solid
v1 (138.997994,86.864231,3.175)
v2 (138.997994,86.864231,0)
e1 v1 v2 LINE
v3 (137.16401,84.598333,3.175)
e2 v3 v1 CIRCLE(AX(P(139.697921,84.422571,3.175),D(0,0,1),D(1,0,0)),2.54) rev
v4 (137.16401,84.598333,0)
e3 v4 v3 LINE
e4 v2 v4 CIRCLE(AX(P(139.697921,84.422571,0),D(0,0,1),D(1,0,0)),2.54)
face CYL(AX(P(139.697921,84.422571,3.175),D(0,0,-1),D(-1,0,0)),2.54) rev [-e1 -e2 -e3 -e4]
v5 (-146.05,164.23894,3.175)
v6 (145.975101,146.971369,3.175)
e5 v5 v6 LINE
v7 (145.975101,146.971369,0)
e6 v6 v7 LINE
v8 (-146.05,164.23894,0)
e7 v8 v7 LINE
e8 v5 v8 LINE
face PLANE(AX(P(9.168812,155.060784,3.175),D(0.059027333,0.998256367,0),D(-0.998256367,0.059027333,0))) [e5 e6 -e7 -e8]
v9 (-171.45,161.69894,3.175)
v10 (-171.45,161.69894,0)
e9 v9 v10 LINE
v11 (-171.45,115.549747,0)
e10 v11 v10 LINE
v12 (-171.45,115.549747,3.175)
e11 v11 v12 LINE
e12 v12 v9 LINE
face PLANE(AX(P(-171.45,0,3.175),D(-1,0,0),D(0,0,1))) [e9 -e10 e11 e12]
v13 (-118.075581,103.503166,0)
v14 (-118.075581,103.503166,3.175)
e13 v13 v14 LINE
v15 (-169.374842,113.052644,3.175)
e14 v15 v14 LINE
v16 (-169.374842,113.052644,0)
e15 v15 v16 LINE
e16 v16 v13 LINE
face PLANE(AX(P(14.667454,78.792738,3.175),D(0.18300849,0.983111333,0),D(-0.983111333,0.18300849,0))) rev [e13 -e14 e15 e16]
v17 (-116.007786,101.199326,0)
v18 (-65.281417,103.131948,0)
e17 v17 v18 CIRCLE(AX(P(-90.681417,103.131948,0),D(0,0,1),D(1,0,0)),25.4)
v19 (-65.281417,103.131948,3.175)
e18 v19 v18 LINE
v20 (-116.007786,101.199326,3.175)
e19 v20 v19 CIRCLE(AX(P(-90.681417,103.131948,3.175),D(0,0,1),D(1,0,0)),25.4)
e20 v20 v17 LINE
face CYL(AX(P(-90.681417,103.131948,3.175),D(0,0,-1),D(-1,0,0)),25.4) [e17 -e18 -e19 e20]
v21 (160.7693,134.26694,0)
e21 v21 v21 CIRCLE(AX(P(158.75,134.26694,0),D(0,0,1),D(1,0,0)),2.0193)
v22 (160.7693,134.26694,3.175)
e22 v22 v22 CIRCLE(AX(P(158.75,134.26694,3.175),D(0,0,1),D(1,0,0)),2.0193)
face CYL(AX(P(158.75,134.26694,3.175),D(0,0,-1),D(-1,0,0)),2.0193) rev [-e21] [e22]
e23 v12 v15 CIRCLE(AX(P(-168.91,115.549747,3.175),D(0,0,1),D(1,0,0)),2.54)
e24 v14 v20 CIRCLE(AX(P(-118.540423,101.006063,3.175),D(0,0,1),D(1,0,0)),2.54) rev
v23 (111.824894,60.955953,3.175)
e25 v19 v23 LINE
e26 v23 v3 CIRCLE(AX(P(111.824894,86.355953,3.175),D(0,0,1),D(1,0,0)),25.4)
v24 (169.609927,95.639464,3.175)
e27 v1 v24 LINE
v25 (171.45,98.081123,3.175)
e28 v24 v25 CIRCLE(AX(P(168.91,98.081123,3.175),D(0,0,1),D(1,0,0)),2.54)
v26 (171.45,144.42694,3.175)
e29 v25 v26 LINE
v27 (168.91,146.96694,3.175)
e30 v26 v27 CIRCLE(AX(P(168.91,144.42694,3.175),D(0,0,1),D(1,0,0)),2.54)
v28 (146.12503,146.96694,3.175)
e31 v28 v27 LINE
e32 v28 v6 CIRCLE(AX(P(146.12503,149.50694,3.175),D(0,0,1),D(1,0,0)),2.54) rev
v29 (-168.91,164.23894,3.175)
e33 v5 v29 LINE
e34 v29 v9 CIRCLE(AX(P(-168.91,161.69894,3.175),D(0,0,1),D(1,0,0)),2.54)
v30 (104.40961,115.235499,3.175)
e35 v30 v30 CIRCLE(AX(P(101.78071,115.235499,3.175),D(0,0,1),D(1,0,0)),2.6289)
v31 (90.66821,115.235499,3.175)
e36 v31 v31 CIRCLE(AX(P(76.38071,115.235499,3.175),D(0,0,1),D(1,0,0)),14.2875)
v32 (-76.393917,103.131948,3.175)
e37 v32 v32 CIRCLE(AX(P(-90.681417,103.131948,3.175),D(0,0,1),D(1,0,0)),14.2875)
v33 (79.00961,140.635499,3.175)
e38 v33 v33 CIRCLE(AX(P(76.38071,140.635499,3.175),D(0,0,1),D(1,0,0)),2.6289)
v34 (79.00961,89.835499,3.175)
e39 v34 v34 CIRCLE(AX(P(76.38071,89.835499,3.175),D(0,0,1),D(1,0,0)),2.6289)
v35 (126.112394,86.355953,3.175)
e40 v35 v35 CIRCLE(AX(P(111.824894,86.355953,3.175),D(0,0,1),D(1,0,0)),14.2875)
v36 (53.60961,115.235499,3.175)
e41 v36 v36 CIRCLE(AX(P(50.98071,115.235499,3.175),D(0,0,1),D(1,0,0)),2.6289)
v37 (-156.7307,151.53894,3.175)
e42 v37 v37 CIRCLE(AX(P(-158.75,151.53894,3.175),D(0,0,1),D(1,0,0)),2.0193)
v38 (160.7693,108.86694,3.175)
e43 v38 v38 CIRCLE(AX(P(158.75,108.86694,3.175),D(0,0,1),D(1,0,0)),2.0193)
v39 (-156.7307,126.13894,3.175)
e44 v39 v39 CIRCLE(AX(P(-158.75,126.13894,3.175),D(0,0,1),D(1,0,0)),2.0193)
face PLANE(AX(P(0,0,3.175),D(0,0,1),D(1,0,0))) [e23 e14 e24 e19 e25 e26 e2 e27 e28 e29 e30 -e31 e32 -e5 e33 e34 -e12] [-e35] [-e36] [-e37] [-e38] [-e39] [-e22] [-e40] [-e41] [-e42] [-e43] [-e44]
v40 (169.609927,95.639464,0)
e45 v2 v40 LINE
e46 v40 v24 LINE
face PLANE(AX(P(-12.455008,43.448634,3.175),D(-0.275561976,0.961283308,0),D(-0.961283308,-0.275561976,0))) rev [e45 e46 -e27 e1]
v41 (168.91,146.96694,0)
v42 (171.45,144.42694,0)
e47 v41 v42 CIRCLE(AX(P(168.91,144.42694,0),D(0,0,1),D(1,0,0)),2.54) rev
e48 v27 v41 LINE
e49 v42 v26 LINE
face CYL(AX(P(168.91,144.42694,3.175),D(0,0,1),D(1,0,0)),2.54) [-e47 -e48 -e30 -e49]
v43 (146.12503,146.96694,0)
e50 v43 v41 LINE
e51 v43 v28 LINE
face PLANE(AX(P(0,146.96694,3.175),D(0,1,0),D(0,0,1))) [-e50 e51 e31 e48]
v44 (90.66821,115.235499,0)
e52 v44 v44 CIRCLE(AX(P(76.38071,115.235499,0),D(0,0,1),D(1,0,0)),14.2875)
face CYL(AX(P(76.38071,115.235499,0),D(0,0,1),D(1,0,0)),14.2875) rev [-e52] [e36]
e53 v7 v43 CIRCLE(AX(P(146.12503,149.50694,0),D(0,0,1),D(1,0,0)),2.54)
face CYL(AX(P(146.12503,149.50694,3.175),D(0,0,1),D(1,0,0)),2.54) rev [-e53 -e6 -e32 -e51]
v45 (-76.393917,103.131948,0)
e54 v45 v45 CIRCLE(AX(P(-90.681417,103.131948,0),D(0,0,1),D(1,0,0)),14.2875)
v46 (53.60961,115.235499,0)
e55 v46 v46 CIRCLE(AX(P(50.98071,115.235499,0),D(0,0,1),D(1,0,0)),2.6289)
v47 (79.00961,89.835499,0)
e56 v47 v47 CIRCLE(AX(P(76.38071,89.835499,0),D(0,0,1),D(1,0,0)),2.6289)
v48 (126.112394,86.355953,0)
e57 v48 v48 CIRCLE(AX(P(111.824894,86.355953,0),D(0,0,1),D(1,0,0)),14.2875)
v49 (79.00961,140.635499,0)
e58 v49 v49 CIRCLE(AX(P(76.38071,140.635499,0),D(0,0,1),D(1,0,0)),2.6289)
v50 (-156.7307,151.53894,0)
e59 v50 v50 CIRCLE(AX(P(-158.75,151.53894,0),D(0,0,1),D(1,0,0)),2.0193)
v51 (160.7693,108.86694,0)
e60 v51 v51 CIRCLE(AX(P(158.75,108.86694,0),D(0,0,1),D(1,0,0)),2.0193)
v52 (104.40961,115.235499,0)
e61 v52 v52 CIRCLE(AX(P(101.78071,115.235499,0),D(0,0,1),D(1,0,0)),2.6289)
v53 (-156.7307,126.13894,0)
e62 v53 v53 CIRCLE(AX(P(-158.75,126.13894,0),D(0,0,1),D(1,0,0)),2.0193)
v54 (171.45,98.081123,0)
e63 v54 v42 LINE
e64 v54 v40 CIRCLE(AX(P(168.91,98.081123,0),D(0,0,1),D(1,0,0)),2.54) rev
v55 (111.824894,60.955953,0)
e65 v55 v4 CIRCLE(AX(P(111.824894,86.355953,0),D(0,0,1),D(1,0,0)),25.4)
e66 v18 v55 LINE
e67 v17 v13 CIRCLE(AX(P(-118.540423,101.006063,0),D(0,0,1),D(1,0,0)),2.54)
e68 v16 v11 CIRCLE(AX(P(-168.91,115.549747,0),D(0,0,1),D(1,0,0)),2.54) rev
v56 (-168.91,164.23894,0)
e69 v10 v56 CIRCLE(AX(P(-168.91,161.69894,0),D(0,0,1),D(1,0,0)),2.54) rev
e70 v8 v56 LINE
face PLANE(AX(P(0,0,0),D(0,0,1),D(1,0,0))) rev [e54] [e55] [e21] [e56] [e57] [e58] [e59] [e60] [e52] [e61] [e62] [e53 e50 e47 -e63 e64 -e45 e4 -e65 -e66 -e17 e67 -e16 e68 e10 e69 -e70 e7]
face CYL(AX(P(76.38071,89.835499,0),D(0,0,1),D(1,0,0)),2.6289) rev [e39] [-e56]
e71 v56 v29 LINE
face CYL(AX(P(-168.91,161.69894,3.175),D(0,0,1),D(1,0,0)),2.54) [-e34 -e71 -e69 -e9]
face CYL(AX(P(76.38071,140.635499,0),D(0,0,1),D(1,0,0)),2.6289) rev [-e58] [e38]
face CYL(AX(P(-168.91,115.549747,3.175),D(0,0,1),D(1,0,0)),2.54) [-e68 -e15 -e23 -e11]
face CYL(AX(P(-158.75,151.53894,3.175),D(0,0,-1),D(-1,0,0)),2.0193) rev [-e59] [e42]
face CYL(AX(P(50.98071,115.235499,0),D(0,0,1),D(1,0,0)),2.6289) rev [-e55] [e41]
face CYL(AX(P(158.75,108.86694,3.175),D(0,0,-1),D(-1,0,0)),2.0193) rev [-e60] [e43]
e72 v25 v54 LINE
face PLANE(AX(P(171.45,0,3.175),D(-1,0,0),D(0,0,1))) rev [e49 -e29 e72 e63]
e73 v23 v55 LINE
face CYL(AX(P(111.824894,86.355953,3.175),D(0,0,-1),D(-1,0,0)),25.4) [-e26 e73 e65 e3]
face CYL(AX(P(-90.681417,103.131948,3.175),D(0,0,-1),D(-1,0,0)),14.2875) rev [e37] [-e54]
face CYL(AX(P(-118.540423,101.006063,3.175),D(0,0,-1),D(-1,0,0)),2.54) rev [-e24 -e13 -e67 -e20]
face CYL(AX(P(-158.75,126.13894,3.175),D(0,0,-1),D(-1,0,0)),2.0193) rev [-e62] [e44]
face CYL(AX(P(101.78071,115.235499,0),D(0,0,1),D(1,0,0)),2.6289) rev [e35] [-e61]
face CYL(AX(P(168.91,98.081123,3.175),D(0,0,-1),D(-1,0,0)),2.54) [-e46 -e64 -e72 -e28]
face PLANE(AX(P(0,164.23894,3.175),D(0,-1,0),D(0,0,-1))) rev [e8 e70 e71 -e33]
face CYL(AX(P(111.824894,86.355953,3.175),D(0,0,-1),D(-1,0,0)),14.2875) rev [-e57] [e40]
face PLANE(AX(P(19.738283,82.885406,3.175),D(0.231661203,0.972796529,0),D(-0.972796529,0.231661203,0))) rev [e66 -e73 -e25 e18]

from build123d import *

# Parameters (mm, degrees)
SKETCH1_R           = 14.2875
SKETCH1_R_2         = 2.0193
BOSS_EXTRUDE1_DEPTH = 3.175
FILLET1_R           = 2.54
SKETCH2_R           = 14.2875
SKETCH2_R_2         = 2.6289
CUT_EXTRUDE1_DEPTH  = 238.443914509


with BuildPart() as part:
    # Sketch1 → Boss-Extrude1 (new body)
    with BuildSketch(Plane.XY):
        with BuildLine():
            Line((146.05, 146.96694), (-146.05, 164.23894))
            Line((-146.05, 164.23894), (-171.45, 164.23894))
            Line((-171.45, 164.23894), (-171.45, 113.43894))
            Line((-171.45, 113.43894), (-116.081416722, 103.131947821))
            ThreePointArc((-116.081416722, 103.131947821), (-90.681416722, 77.731947821), (-65.281416722, 103.131947821))
            Line((-65.281416722, 103.131947821), (100.376646224, 63.682232473))
            Line((100.376646224, 63.682232473), (111.82489431, 60.955953292))
            ThreePointArc((111.82489431, 60.955953292), (129.785406552, 68.395441049), (137.22489431, 86.355953292))
            Line((137.22489431, 86.355953292), (171.45, 96.16694))
            Line((171.45, 96.16694), (171.45, 146.96694))
            Line((171.45, 146.96694), (146.05, 146.96694))
        make_face()
        with Locations((-90.681416722, 103.131947821)):
            Circle(SKETCH1_R, mode=Mode.SUBTRACT)
        with Locations((111.82489431, 86.355953292)):
            Circle(SKETCH1_R, mode=Mode.SUBTRACT)
        with Locations((158.75, 108.86694)):
            Circle(SKETCH1_R_2, mode=Mode.SUBTRACT)
        with Locations((-158.75, 126.13894)):
            Circle(SKETCH1_R_2, mode=Mode.SUBTRACT)
        with Locations((-158.75, 151.53894)):
            Circle(SKETCH1_R_2, mode=Mode.SUBTRACT)
        with Locations((158.75, 134.26694)):
            Circle(SKETCH1_R_2, mode=Mode.SUBTRACT)
    extrude(amount=BOSS_EXTRUDE1_DEPTH)

    # Fillet1
    # the kernel refuses this fillet: 2.54 mm, written as the material it adds along each edge
    with BuildSketch(Plane(origin=(-116.081416722, 103.131947821, 0), x_dir=(0.03807134416902504, -0.9992750235811778, 0), z_dir=(0, 0, 1))) as fillet1_piece_1:
        with BuildLine():
            CenterArc((2.030725498, -2.53815856), FILLET1_R, 92.181854631, 75.091245619)
            Line((-0.446869803, -1.978585935), (0, 0))
            ThreePointArc((0, 0), (0.967012142, -0.018414401), (1.934024284, 0))
        make_face()
    extrude(amount=3.175)
    with BuildSketch(Plane(origin=(146.05, 146.96694, 0), x_dir=(-0.9982563668513765, 0.05902733299658733, 0), z_dir=(0, 0, 1))) as fillet1_piece_2:
        with BuildLine():
            CenterArc((FILLET1_R * 0.0295394194538, -FILLET1_R), FILLET1_R, 90, 3.383984094)
            Line((-FILLET1_R * 0.0294879135427, -FILLET1_R * 0.00174363314863), (0, 0))
            Line((0, 0), (FILLET1_R * 0.0295394194537, 0))
        make_face()
    extrude(amount=3.175)
    with BuildSketch(Plane(origin=(137.22489431, 86.355953292, 0), x_dir=(0.9612833075503745, 0.2755619760144931, 0), z_dir=(0, 0, 1))) as fillet1_piece_3:
        with BuildLine():
            CenterArc((1.844513026, -2.54), FILLET1_R, 90, 70.036589556)
            ThreePointArc((-0.542860523, -1.672793255), (-0.256948075, -0.841096436), (0, 0))
            Line((0, 0), (1.844513026, 0))
        make_face()
    extrude(amount=3.175)
    # the kernel refuses this fillet: 2.54 mm, written as the material it takes off along each edge
    with BuildSketch(Plane(origin=(-171.45, 113.43894, -5.277017888), x_dir=(0, 1, 0), z_dir=(0, 0, 1))) as fillet1_2_piece_1:
        with BuildLine():
            CenterArc((FILLET1_R * 0.831026439026, -FILLET1_R), FILLET1_R, 90, 79.454954882)
            Line((-FILLET1_R * 0.152084893732, -FILLET1_R * 0.816991510029), (0, 0))
            Line((0, 0), (FILLET1_R * 0.831026439026, 0))
        make_face()
    extrude(amount=13.729035776, mode=Mode.SUBTRACT)
    with BuildSketch(Plane(origin=(-171.45, 164.23894, -6.35), x_dir=(1, 0, 0), z_dir=(0, 0, 1)), Plane(origin=(171.45, 146.96694, -6.35), x_dir=(0, -1, 0), z_dir=(0, 0, 1))) as fillet1_2_piece_2:
        with BuildLine():
            CenterArc((FILLET1_R, -FILLET1_R), FILLET1_R, 90, 90)
            Line((0, -FILLET1_R), (0, 0))
            Line((0, 0), (FILLET1_R, 0))
        make_face()
    extrude(amount=15.875, mode=Mode.SUBTRACT)
    with BuildSketch(Plane(origin=(171.45, 96.16694, -4.78545858), x_dir=(-0.9612833075503753, -0.2755619760144905, 0), z_dir=(0, 0, 1))) as fillet1_2_piece_3:
        with BuildLine():
            CenterArc((FILLET1_R * 0.753615524472, -FILLET1_R), FILLET1_R, 90, 74.004492945)
            Line((-FILLET1_R * 0.207667783079, -FILLET1_R * 0.724438023986), (0, 0))
            Line((0, 0), (FILLET1_R * 0.753615524472, 0))
        make_face()
    extrude(amount=12.745917161, mode=Mode.SUBTRACT)

    # Sketch2 → Cut-Extrude1 (cut, through all)
    with BuildSketch(Plane.XY.offset(3.175)):
        with Locations((76.380709582, 115.23549915)):
            Circle(SKETCH2_R)
        with Locations((76.380709582, 140.63549915)):
            Circle(SKETCH2_R_2)
        with Locations((101.780709582, 115.23549915)):
            Circle(SKETCH2_R_2)
        with Locations((76.380709582, 89.83549915)):
            Circle(SKETCH2_R_2)
        with Locations((50.980709582, 115.23549915)):
            Circle(SKETCH2_R_2)
    extrude(amount=-CUT_EXTRUDE1_DEPTH, mode=Mode.SUBTRACT)


solid = part.part
